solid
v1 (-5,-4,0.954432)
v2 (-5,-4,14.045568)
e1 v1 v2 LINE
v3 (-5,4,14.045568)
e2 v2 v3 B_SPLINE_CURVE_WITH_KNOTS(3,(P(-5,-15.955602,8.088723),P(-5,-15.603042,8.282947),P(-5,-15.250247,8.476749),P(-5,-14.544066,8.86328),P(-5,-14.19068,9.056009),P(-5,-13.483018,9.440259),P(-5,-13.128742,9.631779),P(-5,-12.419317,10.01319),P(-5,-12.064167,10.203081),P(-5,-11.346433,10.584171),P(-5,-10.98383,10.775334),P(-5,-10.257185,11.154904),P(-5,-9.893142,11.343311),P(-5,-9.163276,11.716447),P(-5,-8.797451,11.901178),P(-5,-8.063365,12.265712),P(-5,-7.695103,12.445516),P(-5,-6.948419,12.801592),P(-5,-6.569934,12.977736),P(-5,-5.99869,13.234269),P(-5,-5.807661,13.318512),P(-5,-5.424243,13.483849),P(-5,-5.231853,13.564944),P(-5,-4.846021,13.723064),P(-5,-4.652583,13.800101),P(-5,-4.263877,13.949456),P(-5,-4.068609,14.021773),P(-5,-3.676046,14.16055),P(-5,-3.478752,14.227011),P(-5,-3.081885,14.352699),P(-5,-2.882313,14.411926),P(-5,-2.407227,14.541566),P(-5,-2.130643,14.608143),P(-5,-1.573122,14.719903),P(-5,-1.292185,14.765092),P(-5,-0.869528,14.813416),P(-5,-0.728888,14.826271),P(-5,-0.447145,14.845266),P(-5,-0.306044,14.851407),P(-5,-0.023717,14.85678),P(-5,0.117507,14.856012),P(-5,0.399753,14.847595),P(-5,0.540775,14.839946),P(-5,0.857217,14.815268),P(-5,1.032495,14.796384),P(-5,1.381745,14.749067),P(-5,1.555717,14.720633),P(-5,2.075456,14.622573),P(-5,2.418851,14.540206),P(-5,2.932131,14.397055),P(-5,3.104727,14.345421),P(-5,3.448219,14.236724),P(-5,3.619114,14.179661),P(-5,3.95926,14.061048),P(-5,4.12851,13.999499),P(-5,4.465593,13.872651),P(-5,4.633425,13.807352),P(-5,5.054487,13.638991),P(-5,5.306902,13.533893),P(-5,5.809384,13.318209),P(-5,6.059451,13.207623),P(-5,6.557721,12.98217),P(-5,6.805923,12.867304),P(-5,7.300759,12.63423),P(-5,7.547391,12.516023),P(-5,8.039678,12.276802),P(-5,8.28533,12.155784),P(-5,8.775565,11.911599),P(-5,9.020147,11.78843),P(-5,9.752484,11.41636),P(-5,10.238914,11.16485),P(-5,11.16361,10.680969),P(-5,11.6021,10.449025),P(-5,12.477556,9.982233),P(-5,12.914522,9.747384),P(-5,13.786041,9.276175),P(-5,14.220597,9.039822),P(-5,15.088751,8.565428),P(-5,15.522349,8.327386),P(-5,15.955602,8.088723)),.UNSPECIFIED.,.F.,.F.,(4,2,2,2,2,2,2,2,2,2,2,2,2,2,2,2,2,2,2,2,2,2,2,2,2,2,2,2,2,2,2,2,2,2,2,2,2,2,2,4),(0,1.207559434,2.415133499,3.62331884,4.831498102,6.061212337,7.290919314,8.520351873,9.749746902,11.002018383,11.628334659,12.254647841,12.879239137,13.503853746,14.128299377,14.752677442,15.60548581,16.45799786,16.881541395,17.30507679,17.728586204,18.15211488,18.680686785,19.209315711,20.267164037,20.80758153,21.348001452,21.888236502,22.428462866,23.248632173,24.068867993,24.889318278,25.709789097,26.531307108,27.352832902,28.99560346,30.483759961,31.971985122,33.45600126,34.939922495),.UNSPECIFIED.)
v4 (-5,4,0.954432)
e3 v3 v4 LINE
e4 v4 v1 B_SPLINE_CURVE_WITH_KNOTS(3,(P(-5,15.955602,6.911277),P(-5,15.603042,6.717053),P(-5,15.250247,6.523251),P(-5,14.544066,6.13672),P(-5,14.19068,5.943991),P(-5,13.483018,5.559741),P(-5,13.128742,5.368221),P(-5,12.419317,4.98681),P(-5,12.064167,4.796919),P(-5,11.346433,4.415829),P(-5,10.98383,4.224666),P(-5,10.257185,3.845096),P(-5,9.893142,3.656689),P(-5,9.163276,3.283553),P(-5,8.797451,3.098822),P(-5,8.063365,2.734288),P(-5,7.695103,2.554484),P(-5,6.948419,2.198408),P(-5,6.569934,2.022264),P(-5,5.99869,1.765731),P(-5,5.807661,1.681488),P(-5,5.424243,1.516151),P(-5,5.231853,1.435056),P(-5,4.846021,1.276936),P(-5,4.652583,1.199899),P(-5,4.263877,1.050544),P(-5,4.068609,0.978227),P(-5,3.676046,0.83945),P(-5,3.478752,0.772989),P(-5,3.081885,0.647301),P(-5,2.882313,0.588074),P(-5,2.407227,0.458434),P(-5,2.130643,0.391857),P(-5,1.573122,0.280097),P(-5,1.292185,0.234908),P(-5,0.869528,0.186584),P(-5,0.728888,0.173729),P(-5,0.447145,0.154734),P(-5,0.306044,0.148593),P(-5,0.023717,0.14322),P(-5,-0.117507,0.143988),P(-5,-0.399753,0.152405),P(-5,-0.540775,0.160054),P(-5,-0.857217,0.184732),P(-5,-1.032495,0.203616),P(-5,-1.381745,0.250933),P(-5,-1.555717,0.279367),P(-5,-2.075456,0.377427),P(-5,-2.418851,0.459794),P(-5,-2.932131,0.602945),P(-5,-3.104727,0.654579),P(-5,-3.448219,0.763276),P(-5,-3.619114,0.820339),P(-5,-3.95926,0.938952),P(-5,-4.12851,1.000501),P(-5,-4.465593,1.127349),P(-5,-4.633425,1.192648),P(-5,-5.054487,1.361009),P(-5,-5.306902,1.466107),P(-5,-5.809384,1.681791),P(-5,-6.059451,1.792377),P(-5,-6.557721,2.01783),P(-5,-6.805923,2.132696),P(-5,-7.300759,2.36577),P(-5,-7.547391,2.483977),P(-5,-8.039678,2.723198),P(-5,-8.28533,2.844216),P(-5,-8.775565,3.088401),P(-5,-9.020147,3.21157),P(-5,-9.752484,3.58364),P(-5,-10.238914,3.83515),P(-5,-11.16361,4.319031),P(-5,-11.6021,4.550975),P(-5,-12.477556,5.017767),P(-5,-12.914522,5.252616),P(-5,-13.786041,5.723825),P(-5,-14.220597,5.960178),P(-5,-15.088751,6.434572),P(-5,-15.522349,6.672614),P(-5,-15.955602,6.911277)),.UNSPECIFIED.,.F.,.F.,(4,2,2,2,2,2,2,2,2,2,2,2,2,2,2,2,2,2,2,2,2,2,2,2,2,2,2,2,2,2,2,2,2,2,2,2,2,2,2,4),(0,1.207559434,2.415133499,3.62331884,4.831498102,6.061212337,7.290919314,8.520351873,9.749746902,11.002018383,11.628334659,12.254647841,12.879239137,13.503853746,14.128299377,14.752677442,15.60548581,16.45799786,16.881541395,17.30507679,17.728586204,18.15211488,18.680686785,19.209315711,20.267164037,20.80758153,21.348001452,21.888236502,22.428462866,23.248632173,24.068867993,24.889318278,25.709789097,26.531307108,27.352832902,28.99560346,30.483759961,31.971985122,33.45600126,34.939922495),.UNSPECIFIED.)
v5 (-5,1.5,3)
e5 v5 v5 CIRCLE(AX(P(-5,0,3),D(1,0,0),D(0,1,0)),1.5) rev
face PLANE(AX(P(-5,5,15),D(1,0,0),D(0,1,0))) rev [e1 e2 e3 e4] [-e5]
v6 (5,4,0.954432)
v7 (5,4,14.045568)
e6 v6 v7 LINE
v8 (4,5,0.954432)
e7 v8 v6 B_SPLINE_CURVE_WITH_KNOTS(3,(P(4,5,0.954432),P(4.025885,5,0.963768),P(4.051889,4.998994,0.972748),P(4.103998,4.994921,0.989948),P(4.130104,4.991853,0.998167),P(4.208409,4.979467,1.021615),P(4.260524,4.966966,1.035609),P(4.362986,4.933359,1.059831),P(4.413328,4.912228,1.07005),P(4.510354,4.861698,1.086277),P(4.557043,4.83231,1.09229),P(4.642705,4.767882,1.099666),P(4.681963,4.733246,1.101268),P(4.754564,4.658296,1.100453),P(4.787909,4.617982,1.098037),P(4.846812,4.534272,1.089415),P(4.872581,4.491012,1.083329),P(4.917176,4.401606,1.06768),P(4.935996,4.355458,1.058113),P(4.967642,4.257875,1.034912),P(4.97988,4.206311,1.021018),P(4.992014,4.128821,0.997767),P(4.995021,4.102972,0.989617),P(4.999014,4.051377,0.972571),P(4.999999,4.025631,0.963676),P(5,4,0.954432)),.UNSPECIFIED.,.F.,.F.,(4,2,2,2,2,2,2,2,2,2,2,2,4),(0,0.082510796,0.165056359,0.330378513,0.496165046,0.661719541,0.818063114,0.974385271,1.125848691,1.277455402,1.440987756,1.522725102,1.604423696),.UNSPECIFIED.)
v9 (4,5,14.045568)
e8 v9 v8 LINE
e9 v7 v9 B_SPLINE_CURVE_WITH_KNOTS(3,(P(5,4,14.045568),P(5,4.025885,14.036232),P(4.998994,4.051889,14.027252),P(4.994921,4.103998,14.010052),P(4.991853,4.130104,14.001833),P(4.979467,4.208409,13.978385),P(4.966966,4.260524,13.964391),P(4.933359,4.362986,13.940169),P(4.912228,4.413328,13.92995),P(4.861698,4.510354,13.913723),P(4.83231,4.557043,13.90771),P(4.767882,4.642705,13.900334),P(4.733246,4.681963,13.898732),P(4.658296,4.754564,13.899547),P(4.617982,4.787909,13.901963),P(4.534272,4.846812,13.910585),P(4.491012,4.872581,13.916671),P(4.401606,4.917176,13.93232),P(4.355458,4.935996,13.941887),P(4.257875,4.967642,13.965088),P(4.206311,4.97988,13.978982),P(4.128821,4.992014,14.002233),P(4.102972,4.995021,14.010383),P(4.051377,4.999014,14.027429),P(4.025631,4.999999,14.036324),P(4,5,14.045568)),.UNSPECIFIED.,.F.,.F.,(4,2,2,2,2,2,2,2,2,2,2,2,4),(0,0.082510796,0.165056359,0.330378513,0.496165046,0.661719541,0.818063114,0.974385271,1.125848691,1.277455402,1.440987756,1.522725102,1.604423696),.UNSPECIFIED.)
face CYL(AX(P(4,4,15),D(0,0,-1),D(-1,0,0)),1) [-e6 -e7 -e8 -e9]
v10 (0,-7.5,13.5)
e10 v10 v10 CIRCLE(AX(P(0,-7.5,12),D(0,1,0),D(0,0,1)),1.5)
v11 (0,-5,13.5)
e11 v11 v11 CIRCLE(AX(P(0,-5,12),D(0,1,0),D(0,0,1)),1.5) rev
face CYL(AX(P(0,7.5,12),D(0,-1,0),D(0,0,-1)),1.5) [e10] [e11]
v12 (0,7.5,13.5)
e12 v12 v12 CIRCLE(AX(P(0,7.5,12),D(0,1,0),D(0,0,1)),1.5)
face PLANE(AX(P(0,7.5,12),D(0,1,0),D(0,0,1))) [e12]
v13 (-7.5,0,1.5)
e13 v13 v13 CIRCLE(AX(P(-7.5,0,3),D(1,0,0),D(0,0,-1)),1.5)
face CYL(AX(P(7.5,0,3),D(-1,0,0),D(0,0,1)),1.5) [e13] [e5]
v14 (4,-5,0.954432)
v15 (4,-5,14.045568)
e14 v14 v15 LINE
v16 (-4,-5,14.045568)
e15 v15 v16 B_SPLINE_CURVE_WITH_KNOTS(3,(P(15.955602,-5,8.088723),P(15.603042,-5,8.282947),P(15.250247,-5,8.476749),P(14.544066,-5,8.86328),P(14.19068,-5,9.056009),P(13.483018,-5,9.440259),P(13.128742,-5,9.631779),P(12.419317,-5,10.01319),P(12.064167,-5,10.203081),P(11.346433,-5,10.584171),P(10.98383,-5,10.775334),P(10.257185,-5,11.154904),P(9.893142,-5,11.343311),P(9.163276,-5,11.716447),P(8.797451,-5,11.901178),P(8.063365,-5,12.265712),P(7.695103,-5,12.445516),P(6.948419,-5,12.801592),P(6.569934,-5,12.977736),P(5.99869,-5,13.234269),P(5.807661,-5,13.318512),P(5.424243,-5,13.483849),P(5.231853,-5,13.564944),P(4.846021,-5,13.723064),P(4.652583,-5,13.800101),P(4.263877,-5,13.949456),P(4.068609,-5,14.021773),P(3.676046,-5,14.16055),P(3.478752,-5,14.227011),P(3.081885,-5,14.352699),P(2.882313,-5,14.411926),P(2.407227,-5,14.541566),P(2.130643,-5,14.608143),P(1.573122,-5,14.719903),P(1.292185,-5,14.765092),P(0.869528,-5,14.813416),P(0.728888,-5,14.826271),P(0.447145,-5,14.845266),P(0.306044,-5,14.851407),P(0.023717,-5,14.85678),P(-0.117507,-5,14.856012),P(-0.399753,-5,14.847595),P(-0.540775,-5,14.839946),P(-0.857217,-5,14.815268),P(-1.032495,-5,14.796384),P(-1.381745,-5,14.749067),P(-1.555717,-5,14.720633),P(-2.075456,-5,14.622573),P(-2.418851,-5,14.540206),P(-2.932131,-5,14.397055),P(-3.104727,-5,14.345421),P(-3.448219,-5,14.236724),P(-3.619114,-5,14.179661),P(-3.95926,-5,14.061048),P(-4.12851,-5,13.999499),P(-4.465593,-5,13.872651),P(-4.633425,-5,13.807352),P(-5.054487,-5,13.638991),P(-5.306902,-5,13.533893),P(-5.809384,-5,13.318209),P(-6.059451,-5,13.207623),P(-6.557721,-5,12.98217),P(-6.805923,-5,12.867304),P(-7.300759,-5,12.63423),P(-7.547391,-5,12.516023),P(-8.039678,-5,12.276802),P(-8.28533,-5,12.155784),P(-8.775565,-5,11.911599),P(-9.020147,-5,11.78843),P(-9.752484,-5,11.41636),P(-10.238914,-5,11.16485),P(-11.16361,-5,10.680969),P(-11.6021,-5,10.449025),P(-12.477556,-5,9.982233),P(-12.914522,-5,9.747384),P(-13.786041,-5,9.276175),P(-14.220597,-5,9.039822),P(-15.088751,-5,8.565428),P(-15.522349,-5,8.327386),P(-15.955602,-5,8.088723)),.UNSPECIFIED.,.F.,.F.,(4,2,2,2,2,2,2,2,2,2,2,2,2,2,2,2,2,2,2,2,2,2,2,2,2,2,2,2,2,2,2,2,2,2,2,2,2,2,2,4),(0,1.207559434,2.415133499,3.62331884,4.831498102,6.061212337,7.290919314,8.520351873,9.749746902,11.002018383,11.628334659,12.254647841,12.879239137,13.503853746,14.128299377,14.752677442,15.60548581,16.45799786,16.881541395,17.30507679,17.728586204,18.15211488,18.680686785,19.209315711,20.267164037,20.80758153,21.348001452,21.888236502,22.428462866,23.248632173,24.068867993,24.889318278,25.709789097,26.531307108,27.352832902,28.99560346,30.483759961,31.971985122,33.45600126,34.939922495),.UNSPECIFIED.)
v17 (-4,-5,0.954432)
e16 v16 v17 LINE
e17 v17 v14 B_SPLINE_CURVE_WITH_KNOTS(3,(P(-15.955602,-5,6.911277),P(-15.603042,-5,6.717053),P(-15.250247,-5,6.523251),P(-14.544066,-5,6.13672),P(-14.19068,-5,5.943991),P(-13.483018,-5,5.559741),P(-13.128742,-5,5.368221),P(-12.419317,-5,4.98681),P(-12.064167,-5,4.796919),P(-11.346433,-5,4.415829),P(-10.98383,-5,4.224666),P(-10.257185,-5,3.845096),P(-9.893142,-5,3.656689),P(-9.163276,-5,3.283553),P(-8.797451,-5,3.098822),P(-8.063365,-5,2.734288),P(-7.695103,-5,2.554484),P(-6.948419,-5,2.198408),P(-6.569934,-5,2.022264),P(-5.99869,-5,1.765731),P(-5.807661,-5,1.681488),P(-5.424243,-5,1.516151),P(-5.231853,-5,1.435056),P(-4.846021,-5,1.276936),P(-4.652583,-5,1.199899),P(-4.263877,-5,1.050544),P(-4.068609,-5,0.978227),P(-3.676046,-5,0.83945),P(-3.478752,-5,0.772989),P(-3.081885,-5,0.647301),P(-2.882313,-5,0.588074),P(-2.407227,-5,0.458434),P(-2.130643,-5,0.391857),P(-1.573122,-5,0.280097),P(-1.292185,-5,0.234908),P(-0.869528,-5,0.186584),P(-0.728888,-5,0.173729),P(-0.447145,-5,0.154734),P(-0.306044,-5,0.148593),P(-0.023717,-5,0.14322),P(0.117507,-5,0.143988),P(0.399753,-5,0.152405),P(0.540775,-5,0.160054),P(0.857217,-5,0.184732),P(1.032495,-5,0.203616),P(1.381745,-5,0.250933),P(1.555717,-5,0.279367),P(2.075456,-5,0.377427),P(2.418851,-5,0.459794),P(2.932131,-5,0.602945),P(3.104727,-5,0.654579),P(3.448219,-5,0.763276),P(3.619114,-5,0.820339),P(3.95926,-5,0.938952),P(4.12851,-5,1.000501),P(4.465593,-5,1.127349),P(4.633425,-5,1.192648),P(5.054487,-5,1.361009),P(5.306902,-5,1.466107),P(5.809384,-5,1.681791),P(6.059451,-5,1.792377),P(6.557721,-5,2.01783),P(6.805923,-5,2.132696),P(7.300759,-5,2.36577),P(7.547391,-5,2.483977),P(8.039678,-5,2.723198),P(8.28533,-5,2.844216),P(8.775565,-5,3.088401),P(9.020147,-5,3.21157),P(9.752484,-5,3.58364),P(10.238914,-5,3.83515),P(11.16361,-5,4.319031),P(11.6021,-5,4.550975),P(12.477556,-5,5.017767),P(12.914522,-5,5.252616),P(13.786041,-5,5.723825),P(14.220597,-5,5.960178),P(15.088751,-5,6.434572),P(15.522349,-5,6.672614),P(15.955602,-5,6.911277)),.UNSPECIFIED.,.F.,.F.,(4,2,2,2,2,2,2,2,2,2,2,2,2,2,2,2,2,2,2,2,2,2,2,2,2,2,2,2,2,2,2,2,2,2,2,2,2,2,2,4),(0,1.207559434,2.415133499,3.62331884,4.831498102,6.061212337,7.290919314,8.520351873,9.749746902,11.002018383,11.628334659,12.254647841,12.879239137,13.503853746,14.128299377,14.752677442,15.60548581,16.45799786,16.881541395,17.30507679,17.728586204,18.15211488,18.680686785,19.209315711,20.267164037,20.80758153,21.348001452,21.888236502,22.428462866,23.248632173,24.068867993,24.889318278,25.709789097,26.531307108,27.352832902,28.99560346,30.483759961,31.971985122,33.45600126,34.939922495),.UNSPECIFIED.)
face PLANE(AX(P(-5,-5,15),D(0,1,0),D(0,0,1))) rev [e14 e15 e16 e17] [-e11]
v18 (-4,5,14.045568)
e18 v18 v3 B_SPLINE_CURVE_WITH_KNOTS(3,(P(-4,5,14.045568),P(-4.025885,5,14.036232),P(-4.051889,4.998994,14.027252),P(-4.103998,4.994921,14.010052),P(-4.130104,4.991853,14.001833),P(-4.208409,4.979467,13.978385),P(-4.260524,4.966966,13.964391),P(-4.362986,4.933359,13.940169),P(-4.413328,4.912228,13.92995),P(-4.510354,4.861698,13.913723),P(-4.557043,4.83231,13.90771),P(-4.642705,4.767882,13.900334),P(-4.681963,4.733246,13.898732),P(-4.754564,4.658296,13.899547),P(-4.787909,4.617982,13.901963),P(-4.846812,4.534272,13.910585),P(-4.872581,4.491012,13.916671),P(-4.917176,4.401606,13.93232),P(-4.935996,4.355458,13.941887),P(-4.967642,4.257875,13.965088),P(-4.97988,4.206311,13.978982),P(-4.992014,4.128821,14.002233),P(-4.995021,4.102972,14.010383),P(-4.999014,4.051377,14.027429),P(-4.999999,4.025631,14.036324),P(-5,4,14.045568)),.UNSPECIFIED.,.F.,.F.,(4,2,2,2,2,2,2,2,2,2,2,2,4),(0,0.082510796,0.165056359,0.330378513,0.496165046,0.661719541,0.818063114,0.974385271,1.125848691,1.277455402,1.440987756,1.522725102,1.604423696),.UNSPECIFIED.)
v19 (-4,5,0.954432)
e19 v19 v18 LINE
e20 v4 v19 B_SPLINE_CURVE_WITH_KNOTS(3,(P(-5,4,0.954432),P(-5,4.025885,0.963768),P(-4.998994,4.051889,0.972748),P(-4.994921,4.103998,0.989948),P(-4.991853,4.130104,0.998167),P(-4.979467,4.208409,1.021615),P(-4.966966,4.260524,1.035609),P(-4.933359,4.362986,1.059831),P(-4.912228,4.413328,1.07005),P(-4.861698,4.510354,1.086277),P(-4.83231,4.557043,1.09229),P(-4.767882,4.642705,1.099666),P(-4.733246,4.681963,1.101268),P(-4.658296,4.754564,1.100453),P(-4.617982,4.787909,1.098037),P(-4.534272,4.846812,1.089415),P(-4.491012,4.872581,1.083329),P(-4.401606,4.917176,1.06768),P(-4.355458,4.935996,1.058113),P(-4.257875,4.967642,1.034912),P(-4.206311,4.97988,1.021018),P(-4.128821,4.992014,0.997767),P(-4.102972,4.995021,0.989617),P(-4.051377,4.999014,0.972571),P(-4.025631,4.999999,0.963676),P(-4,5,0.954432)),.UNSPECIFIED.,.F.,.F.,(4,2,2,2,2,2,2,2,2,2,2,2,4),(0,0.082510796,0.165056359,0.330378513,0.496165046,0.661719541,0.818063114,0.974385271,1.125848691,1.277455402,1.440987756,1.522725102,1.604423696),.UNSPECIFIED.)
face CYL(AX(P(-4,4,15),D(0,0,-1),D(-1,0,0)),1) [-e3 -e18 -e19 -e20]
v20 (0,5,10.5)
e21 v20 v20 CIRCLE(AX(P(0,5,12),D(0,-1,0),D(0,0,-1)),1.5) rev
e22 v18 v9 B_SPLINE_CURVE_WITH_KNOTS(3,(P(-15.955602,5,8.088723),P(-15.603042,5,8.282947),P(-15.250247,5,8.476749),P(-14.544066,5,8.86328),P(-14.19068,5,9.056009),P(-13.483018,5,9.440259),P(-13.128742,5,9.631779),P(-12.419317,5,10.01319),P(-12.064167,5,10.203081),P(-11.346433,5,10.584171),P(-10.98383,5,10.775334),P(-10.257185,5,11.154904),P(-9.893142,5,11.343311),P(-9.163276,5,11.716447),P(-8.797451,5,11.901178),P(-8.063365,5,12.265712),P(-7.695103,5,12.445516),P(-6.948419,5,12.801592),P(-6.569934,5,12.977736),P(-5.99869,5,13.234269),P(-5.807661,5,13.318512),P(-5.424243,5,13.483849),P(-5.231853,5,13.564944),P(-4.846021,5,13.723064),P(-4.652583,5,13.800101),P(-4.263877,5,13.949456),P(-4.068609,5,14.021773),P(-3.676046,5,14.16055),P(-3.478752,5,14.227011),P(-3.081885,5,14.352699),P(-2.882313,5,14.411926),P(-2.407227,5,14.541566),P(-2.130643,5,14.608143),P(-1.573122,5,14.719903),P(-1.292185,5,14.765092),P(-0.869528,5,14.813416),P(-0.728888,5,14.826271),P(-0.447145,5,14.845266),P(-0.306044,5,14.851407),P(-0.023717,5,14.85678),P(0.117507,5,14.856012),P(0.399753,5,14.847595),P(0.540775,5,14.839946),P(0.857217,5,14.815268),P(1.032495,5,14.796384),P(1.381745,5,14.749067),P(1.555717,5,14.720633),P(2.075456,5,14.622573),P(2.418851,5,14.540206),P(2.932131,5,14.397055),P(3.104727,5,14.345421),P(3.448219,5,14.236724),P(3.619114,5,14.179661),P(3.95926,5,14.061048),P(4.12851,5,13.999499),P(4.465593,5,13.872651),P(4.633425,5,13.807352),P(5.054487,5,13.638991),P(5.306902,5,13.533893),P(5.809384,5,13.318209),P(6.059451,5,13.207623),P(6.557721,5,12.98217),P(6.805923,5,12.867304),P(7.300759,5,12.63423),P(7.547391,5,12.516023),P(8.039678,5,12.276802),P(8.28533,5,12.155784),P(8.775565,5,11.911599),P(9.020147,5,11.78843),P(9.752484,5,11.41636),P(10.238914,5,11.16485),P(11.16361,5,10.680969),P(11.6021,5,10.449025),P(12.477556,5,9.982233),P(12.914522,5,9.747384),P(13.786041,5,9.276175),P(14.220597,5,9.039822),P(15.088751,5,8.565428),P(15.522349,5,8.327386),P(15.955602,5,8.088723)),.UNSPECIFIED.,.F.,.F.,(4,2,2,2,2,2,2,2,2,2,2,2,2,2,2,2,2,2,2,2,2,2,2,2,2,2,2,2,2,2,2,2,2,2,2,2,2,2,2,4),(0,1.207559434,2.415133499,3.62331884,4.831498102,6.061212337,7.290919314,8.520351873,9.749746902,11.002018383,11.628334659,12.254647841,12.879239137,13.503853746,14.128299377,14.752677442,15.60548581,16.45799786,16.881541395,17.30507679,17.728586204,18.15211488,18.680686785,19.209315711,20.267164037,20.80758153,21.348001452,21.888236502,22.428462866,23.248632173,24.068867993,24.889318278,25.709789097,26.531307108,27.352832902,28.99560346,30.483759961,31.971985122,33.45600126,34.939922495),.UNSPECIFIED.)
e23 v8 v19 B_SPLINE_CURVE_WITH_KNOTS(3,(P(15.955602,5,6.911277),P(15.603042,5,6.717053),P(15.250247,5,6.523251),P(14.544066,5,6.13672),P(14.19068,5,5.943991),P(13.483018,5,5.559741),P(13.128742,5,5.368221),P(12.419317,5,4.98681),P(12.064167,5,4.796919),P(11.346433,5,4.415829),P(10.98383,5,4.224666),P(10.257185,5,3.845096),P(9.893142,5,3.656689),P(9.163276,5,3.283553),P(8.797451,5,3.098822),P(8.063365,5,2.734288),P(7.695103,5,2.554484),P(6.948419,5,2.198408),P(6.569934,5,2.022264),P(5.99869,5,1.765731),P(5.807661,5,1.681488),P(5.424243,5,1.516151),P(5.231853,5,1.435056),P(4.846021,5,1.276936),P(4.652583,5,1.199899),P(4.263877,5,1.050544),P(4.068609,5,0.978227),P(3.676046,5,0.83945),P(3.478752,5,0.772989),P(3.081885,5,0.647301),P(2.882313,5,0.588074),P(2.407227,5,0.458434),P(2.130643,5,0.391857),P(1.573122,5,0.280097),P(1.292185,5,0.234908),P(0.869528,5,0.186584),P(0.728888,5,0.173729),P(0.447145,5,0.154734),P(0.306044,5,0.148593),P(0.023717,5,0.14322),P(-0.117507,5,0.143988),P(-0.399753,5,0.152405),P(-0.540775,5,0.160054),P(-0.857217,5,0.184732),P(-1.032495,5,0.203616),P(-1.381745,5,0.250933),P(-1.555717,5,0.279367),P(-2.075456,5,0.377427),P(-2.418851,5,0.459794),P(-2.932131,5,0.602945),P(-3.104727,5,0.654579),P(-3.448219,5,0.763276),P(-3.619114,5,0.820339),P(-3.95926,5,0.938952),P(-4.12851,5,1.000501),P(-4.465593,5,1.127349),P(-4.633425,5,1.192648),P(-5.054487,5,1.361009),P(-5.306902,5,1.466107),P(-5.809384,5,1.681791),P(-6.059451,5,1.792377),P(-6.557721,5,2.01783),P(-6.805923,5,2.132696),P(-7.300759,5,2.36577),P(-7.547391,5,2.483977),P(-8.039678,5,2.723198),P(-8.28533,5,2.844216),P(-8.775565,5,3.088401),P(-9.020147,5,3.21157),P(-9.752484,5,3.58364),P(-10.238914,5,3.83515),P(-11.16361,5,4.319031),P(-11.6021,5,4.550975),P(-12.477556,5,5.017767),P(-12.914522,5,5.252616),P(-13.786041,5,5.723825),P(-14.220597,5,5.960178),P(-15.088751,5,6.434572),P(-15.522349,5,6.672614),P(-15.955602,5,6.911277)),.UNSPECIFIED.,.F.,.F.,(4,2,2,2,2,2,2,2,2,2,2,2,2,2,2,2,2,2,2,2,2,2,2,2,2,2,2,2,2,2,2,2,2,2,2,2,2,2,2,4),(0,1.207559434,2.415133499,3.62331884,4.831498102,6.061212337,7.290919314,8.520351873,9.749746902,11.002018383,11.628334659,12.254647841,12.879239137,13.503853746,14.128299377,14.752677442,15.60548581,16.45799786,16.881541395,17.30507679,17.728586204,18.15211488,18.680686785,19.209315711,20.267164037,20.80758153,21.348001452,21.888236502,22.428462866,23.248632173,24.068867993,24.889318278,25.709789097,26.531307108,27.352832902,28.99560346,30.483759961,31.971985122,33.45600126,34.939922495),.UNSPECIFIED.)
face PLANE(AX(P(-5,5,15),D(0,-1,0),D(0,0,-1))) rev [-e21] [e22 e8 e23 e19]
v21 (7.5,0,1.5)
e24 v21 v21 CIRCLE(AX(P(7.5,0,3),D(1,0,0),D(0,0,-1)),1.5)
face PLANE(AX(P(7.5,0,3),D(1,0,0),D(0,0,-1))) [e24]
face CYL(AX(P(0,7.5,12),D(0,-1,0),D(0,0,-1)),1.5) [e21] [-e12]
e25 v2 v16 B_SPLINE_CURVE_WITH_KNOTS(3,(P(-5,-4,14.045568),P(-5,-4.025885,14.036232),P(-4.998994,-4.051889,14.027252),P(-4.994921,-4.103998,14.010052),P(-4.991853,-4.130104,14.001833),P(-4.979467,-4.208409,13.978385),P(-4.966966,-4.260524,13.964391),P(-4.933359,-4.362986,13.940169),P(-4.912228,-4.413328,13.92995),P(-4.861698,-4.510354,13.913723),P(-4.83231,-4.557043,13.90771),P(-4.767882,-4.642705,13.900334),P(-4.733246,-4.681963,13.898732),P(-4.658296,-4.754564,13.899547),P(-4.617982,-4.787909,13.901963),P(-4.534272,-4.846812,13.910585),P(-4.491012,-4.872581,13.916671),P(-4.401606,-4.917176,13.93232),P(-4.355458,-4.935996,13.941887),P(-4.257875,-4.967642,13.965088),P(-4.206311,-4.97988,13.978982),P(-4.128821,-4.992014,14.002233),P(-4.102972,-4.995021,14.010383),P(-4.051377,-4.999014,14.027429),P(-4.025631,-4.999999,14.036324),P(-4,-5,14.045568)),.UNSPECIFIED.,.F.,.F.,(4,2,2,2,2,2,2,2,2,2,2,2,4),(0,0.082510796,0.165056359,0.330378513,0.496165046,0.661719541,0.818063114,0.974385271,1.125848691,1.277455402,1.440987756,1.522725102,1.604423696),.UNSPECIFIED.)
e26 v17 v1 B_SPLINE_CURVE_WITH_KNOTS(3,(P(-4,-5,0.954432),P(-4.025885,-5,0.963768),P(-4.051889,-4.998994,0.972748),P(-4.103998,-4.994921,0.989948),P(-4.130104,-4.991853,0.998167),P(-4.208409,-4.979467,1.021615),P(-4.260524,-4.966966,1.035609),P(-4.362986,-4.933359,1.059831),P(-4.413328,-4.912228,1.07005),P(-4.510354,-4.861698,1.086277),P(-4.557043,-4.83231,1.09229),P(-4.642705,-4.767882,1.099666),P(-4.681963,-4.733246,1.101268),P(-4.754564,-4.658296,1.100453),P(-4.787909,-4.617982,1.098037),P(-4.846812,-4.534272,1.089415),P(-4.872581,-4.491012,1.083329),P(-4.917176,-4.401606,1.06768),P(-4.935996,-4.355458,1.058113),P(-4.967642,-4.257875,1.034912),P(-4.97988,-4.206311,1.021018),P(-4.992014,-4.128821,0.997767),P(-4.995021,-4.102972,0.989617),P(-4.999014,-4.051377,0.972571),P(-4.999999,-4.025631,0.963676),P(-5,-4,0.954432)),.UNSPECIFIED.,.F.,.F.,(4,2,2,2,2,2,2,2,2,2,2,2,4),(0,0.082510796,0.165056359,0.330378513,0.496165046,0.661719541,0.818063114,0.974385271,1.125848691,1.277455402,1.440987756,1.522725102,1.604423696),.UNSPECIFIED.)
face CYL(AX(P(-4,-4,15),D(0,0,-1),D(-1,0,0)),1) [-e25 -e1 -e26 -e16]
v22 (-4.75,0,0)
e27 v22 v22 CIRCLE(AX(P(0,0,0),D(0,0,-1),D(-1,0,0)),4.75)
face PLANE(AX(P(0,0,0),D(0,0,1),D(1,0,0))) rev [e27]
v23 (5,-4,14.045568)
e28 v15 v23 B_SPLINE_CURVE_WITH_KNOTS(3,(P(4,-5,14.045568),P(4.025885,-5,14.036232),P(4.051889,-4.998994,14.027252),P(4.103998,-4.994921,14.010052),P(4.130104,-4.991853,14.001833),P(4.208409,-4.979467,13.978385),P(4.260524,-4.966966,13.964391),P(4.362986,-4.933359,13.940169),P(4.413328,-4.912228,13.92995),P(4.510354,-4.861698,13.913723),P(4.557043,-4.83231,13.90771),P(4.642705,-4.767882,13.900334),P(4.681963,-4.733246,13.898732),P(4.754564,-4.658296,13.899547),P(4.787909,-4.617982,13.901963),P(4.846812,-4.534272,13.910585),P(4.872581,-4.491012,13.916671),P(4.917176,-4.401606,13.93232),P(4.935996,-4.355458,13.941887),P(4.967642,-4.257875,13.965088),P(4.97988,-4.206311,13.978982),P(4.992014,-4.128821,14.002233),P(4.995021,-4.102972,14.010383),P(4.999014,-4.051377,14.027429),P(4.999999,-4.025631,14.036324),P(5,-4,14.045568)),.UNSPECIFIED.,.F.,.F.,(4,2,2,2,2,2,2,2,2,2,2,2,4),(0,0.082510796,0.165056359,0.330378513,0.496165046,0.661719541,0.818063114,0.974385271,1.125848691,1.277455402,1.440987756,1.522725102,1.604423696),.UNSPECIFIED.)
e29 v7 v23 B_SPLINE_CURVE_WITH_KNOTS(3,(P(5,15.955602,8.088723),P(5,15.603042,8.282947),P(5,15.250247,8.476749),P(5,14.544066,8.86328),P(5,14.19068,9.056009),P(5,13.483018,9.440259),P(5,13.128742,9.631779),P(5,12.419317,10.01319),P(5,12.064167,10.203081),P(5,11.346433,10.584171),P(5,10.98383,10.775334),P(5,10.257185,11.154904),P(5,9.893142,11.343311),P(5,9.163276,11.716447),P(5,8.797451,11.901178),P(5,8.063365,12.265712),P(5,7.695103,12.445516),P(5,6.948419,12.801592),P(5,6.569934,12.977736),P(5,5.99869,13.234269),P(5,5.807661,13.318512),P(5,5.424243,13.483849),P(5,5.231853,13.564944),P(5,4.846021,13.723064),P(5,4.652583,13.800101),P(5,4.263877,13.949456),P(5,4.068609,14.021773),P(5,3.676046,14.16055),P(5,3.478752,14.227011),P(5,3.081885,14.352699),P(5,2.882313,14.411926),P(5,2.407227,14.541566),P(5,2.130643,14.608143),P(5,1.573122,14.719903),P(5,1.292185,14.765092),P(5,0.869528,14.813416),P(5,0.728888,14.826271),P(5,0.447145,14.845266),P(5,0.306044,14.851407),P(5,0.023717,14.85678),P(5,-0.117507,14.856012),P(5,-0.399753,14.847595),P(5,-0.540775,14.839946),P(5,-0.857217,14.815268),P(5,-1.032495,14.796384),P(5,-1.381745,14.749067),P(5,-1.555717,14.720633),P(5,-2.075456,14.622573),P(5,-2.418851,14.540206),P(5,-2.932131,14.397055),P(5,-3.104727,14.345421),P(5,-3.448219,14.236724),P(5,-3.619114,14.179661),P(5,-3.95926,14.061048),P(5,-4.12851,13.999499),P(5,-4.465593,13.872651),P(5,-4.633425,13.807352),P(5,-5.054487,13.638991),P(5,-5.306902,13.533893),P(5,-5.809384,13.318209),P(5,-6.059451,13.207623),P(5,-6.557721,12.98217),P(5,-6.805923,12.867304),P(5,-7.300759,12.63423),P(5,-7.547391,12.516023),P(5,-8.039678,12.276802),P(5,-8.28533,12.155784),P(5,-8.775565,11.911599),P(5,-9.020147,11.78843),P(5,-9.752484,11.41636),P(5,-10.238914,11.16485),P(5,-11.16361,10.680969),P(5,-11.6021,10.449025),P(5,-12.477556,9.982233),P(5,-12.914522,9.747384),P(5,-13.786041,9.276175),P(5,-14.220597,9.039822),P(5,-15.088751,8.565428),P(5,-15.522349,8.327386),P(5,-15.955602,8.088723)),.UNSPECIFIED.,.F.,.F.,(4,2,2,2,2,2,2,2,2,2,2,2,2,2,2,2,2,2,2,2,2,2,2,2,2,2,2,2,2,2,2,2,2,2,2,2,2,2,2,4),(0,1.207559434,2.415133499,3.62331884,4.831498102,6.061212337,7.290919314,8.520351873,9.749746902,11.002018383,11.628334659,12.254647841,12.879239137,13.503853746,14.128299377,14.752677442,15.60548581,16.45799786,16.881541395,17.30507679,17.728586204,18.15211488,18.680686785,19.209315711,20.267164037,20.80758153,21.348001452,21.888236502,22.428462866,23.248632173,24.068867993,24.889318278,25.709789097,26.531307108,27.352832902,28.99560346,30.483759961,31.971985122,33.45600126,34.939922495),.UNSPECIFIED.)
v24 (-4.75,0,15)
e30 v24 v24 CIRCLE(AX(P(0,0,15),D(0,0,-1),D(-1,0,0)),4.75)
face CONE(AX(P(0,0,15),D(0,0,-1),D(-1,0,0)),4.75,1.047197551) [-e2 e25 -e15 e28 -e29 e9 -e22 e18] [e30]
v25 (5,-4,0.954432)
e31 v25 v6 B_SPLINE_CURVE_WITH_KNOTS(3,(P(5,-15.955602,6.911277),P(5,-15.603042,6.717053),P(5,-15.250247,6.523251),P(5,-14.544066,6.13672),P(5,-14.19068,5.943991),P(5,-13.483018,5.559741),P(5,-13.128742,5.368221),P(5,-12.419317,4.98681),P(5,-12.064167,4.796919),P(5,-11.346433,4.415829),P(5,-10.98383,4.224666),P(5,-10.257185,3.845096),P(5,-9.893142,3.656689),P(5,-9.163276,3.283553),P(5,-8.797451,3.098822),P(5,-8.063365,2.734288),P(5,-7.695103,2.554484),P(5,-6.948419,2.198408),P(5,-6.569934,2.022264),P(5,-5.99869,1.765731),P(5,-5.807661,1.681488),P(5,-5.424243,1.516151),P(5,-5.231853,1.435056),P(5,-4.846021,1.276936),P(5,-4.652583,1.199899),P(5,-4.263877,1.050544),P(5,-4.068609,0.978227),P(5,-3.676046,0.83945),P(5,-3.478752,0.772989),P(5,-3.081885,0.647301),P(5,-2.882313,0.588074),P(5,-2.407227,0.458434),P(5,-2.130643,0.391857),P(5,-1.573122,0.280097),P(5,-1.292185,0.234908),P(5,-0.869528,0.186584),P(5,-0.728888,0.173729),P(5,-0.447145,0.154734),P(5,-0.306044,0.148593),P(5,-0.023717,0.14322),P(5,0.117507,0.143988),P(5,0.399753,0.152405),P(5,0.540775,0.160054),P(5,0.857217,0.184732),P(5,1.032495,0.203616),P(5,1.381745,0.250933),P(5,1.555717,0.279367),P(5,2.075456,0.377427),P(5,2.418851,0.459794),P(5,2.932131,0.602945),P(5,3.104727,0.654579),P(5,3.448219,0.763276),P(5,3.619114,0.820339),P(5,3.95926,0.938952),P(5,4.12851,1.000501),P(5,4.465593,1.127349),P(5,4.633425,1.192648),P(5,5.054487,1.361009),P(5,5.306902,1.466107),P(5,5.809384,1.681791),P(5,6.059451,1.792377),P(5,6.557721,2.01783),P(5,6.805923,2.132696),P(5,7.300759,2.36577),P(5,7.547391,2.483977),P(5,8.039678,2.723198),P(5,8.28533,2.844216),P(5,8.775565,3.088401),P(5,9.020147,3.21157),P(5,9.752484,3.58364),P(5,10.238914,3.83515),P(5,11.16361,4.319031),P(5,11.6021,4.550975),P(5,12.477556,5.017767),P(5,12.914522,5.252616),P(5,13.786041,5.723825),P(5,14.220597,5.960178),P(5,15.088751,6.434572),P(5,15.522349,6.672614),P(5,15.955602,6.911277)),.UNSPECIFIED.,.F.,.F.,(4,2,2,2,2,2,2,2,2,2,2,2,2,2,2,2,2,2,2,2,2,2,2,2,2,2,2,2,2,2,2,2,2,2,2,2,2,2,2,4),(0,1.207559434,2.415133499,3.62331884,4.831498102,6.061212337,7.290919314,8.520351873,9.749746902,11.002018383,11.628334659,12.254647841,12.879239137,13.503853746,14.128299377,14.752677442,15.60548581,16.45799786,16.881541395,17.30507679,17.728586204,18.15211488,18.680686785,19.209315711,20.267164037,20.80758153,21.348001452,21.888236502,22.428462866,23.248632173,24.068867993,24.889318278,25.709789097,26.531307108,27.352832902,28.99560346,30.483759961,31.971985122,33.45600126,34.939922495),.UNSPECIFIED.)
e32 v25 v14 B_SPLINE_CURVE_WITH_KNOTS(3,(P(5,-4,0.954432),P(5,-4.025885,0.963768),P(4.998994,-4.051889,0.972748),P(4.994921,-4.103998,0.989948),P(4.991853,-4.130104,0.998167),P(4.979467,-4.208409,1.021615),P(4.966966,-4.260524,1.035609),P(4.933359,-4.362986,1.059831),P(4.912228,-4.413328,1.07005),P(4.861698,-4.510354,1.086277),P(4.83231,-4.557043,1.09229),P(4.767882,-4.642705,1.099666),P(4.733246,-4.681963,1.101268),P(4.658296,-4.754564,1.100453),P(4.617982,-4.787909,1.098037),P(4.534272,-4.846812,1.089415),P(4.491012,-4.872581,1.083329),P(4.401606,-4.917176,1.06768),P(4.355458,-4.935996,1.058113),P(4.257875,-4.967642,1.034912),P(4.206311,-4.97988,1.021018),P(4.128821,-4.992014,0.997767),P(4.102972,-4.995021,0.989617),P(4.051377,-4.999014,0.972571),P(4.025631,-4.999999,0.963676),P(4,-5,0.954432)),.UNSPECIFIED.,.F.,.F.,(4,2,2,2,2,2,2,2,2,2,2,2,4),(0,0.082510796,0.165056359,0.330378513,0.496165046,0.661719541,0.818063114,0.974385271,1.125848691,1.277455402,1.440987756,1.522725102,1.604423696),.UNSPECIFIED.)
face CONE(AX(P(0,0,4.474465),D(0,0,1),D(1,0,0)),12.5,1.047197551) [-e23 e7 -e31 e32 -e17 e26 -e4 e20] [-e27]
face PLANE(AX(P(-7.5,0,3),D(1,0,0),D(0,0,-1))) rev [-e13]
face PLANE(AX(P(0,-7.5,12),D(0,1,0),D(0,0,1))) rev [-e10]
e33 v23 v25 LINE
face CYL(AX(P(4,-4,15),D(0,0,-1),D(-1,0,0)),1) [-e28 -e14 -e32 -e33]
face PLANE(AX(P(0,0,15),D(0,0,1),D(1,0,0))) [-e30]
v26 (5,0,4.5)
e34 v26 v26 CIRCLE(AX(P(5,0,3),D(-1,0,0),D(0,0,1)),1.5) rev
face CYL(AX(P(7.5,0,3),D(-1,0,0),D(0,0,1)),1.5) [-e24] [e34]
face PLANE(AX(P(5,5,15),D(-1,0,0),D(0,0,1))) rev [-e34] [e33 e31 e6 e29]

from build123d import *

# Parameters (mm, degrees)
CROQUIS1_W              = 10
CROQUIS1_H              = 10
SALIENTE_EXTRUIR1_DEPTH = 15
REDONDEO1_R             = 1
CROQUIS4_R              = 1.5
SALIENTE_EXTRUIR2_DEPTH = 7.5
CROQUIS5_R              = 1.5
SALIENTE_EXTRUIR3_DEPTH = 7.5


with BuildPart() as part:
    # Croquis1 → Saliente-Extruir1 (new body)
    with BuildSketch(Plane.XY):
        Rectangle(CROQUIS1_W, CROQUIS1_H)
    extrude(amount=SALIENTE_EXTRUIR1_DEPTH)

    # Croquis3 → Cortar-Revolución1 (revolve, cut)
    with BuildSketch(Plane(origin=(0, 0, 0), x_dir=(0, 0, -1), z_dir=(1, 0, 0))):
        Polygon((-15, 4.75), (-15, 15.04), (0, 15.04), (0, 4.75), (-4.474464586, 12.5), (-10.525535414, 12.5), align=None)
    revolve(axis=Axis((0, 0, -0.75), (0, 0, 1)), mode=Mode.SUBTRACT)

    # Redondeo1
    redondeo1_edges = [part.edges().sort_by_distance(p)[0] for p in [
        (-5, 5, 7.5),
        (-5, -5, 7.5),
        (5, -5, 7.5),
        (5, 5, 7.5),
    ]]
    fillet(redondeo1_edges, radius=REDONDEO1_R)

    # Croquis4 → Saliente-Extruir2 (add, symmetric)
    with BuildSketch(Plane(origin=(0, 0, 0), x_dir=(0, 0, -1), z_dir=(1, 0, 0))):
        with Locations((-3, 0)):
            Circle(CROQUIS4_R)
    extrude(amount=SALIENTE_EXTRUIR2_DEPTH, both=True)

    # Croquis5 → Saliente-Extruir3 (add, symmetric)
    with BuildSketch(Plane(origin=(0, 0, 0), x_dir=(1, 0, 0), z_dir=(0, 1, 0))):
        with Locations((0, -12)):
            Circle(CROQUIS5_R)
    extrude(amount=SALIENTE_EXTRUIR3_DEPTH, both=True)


solid = part.part
